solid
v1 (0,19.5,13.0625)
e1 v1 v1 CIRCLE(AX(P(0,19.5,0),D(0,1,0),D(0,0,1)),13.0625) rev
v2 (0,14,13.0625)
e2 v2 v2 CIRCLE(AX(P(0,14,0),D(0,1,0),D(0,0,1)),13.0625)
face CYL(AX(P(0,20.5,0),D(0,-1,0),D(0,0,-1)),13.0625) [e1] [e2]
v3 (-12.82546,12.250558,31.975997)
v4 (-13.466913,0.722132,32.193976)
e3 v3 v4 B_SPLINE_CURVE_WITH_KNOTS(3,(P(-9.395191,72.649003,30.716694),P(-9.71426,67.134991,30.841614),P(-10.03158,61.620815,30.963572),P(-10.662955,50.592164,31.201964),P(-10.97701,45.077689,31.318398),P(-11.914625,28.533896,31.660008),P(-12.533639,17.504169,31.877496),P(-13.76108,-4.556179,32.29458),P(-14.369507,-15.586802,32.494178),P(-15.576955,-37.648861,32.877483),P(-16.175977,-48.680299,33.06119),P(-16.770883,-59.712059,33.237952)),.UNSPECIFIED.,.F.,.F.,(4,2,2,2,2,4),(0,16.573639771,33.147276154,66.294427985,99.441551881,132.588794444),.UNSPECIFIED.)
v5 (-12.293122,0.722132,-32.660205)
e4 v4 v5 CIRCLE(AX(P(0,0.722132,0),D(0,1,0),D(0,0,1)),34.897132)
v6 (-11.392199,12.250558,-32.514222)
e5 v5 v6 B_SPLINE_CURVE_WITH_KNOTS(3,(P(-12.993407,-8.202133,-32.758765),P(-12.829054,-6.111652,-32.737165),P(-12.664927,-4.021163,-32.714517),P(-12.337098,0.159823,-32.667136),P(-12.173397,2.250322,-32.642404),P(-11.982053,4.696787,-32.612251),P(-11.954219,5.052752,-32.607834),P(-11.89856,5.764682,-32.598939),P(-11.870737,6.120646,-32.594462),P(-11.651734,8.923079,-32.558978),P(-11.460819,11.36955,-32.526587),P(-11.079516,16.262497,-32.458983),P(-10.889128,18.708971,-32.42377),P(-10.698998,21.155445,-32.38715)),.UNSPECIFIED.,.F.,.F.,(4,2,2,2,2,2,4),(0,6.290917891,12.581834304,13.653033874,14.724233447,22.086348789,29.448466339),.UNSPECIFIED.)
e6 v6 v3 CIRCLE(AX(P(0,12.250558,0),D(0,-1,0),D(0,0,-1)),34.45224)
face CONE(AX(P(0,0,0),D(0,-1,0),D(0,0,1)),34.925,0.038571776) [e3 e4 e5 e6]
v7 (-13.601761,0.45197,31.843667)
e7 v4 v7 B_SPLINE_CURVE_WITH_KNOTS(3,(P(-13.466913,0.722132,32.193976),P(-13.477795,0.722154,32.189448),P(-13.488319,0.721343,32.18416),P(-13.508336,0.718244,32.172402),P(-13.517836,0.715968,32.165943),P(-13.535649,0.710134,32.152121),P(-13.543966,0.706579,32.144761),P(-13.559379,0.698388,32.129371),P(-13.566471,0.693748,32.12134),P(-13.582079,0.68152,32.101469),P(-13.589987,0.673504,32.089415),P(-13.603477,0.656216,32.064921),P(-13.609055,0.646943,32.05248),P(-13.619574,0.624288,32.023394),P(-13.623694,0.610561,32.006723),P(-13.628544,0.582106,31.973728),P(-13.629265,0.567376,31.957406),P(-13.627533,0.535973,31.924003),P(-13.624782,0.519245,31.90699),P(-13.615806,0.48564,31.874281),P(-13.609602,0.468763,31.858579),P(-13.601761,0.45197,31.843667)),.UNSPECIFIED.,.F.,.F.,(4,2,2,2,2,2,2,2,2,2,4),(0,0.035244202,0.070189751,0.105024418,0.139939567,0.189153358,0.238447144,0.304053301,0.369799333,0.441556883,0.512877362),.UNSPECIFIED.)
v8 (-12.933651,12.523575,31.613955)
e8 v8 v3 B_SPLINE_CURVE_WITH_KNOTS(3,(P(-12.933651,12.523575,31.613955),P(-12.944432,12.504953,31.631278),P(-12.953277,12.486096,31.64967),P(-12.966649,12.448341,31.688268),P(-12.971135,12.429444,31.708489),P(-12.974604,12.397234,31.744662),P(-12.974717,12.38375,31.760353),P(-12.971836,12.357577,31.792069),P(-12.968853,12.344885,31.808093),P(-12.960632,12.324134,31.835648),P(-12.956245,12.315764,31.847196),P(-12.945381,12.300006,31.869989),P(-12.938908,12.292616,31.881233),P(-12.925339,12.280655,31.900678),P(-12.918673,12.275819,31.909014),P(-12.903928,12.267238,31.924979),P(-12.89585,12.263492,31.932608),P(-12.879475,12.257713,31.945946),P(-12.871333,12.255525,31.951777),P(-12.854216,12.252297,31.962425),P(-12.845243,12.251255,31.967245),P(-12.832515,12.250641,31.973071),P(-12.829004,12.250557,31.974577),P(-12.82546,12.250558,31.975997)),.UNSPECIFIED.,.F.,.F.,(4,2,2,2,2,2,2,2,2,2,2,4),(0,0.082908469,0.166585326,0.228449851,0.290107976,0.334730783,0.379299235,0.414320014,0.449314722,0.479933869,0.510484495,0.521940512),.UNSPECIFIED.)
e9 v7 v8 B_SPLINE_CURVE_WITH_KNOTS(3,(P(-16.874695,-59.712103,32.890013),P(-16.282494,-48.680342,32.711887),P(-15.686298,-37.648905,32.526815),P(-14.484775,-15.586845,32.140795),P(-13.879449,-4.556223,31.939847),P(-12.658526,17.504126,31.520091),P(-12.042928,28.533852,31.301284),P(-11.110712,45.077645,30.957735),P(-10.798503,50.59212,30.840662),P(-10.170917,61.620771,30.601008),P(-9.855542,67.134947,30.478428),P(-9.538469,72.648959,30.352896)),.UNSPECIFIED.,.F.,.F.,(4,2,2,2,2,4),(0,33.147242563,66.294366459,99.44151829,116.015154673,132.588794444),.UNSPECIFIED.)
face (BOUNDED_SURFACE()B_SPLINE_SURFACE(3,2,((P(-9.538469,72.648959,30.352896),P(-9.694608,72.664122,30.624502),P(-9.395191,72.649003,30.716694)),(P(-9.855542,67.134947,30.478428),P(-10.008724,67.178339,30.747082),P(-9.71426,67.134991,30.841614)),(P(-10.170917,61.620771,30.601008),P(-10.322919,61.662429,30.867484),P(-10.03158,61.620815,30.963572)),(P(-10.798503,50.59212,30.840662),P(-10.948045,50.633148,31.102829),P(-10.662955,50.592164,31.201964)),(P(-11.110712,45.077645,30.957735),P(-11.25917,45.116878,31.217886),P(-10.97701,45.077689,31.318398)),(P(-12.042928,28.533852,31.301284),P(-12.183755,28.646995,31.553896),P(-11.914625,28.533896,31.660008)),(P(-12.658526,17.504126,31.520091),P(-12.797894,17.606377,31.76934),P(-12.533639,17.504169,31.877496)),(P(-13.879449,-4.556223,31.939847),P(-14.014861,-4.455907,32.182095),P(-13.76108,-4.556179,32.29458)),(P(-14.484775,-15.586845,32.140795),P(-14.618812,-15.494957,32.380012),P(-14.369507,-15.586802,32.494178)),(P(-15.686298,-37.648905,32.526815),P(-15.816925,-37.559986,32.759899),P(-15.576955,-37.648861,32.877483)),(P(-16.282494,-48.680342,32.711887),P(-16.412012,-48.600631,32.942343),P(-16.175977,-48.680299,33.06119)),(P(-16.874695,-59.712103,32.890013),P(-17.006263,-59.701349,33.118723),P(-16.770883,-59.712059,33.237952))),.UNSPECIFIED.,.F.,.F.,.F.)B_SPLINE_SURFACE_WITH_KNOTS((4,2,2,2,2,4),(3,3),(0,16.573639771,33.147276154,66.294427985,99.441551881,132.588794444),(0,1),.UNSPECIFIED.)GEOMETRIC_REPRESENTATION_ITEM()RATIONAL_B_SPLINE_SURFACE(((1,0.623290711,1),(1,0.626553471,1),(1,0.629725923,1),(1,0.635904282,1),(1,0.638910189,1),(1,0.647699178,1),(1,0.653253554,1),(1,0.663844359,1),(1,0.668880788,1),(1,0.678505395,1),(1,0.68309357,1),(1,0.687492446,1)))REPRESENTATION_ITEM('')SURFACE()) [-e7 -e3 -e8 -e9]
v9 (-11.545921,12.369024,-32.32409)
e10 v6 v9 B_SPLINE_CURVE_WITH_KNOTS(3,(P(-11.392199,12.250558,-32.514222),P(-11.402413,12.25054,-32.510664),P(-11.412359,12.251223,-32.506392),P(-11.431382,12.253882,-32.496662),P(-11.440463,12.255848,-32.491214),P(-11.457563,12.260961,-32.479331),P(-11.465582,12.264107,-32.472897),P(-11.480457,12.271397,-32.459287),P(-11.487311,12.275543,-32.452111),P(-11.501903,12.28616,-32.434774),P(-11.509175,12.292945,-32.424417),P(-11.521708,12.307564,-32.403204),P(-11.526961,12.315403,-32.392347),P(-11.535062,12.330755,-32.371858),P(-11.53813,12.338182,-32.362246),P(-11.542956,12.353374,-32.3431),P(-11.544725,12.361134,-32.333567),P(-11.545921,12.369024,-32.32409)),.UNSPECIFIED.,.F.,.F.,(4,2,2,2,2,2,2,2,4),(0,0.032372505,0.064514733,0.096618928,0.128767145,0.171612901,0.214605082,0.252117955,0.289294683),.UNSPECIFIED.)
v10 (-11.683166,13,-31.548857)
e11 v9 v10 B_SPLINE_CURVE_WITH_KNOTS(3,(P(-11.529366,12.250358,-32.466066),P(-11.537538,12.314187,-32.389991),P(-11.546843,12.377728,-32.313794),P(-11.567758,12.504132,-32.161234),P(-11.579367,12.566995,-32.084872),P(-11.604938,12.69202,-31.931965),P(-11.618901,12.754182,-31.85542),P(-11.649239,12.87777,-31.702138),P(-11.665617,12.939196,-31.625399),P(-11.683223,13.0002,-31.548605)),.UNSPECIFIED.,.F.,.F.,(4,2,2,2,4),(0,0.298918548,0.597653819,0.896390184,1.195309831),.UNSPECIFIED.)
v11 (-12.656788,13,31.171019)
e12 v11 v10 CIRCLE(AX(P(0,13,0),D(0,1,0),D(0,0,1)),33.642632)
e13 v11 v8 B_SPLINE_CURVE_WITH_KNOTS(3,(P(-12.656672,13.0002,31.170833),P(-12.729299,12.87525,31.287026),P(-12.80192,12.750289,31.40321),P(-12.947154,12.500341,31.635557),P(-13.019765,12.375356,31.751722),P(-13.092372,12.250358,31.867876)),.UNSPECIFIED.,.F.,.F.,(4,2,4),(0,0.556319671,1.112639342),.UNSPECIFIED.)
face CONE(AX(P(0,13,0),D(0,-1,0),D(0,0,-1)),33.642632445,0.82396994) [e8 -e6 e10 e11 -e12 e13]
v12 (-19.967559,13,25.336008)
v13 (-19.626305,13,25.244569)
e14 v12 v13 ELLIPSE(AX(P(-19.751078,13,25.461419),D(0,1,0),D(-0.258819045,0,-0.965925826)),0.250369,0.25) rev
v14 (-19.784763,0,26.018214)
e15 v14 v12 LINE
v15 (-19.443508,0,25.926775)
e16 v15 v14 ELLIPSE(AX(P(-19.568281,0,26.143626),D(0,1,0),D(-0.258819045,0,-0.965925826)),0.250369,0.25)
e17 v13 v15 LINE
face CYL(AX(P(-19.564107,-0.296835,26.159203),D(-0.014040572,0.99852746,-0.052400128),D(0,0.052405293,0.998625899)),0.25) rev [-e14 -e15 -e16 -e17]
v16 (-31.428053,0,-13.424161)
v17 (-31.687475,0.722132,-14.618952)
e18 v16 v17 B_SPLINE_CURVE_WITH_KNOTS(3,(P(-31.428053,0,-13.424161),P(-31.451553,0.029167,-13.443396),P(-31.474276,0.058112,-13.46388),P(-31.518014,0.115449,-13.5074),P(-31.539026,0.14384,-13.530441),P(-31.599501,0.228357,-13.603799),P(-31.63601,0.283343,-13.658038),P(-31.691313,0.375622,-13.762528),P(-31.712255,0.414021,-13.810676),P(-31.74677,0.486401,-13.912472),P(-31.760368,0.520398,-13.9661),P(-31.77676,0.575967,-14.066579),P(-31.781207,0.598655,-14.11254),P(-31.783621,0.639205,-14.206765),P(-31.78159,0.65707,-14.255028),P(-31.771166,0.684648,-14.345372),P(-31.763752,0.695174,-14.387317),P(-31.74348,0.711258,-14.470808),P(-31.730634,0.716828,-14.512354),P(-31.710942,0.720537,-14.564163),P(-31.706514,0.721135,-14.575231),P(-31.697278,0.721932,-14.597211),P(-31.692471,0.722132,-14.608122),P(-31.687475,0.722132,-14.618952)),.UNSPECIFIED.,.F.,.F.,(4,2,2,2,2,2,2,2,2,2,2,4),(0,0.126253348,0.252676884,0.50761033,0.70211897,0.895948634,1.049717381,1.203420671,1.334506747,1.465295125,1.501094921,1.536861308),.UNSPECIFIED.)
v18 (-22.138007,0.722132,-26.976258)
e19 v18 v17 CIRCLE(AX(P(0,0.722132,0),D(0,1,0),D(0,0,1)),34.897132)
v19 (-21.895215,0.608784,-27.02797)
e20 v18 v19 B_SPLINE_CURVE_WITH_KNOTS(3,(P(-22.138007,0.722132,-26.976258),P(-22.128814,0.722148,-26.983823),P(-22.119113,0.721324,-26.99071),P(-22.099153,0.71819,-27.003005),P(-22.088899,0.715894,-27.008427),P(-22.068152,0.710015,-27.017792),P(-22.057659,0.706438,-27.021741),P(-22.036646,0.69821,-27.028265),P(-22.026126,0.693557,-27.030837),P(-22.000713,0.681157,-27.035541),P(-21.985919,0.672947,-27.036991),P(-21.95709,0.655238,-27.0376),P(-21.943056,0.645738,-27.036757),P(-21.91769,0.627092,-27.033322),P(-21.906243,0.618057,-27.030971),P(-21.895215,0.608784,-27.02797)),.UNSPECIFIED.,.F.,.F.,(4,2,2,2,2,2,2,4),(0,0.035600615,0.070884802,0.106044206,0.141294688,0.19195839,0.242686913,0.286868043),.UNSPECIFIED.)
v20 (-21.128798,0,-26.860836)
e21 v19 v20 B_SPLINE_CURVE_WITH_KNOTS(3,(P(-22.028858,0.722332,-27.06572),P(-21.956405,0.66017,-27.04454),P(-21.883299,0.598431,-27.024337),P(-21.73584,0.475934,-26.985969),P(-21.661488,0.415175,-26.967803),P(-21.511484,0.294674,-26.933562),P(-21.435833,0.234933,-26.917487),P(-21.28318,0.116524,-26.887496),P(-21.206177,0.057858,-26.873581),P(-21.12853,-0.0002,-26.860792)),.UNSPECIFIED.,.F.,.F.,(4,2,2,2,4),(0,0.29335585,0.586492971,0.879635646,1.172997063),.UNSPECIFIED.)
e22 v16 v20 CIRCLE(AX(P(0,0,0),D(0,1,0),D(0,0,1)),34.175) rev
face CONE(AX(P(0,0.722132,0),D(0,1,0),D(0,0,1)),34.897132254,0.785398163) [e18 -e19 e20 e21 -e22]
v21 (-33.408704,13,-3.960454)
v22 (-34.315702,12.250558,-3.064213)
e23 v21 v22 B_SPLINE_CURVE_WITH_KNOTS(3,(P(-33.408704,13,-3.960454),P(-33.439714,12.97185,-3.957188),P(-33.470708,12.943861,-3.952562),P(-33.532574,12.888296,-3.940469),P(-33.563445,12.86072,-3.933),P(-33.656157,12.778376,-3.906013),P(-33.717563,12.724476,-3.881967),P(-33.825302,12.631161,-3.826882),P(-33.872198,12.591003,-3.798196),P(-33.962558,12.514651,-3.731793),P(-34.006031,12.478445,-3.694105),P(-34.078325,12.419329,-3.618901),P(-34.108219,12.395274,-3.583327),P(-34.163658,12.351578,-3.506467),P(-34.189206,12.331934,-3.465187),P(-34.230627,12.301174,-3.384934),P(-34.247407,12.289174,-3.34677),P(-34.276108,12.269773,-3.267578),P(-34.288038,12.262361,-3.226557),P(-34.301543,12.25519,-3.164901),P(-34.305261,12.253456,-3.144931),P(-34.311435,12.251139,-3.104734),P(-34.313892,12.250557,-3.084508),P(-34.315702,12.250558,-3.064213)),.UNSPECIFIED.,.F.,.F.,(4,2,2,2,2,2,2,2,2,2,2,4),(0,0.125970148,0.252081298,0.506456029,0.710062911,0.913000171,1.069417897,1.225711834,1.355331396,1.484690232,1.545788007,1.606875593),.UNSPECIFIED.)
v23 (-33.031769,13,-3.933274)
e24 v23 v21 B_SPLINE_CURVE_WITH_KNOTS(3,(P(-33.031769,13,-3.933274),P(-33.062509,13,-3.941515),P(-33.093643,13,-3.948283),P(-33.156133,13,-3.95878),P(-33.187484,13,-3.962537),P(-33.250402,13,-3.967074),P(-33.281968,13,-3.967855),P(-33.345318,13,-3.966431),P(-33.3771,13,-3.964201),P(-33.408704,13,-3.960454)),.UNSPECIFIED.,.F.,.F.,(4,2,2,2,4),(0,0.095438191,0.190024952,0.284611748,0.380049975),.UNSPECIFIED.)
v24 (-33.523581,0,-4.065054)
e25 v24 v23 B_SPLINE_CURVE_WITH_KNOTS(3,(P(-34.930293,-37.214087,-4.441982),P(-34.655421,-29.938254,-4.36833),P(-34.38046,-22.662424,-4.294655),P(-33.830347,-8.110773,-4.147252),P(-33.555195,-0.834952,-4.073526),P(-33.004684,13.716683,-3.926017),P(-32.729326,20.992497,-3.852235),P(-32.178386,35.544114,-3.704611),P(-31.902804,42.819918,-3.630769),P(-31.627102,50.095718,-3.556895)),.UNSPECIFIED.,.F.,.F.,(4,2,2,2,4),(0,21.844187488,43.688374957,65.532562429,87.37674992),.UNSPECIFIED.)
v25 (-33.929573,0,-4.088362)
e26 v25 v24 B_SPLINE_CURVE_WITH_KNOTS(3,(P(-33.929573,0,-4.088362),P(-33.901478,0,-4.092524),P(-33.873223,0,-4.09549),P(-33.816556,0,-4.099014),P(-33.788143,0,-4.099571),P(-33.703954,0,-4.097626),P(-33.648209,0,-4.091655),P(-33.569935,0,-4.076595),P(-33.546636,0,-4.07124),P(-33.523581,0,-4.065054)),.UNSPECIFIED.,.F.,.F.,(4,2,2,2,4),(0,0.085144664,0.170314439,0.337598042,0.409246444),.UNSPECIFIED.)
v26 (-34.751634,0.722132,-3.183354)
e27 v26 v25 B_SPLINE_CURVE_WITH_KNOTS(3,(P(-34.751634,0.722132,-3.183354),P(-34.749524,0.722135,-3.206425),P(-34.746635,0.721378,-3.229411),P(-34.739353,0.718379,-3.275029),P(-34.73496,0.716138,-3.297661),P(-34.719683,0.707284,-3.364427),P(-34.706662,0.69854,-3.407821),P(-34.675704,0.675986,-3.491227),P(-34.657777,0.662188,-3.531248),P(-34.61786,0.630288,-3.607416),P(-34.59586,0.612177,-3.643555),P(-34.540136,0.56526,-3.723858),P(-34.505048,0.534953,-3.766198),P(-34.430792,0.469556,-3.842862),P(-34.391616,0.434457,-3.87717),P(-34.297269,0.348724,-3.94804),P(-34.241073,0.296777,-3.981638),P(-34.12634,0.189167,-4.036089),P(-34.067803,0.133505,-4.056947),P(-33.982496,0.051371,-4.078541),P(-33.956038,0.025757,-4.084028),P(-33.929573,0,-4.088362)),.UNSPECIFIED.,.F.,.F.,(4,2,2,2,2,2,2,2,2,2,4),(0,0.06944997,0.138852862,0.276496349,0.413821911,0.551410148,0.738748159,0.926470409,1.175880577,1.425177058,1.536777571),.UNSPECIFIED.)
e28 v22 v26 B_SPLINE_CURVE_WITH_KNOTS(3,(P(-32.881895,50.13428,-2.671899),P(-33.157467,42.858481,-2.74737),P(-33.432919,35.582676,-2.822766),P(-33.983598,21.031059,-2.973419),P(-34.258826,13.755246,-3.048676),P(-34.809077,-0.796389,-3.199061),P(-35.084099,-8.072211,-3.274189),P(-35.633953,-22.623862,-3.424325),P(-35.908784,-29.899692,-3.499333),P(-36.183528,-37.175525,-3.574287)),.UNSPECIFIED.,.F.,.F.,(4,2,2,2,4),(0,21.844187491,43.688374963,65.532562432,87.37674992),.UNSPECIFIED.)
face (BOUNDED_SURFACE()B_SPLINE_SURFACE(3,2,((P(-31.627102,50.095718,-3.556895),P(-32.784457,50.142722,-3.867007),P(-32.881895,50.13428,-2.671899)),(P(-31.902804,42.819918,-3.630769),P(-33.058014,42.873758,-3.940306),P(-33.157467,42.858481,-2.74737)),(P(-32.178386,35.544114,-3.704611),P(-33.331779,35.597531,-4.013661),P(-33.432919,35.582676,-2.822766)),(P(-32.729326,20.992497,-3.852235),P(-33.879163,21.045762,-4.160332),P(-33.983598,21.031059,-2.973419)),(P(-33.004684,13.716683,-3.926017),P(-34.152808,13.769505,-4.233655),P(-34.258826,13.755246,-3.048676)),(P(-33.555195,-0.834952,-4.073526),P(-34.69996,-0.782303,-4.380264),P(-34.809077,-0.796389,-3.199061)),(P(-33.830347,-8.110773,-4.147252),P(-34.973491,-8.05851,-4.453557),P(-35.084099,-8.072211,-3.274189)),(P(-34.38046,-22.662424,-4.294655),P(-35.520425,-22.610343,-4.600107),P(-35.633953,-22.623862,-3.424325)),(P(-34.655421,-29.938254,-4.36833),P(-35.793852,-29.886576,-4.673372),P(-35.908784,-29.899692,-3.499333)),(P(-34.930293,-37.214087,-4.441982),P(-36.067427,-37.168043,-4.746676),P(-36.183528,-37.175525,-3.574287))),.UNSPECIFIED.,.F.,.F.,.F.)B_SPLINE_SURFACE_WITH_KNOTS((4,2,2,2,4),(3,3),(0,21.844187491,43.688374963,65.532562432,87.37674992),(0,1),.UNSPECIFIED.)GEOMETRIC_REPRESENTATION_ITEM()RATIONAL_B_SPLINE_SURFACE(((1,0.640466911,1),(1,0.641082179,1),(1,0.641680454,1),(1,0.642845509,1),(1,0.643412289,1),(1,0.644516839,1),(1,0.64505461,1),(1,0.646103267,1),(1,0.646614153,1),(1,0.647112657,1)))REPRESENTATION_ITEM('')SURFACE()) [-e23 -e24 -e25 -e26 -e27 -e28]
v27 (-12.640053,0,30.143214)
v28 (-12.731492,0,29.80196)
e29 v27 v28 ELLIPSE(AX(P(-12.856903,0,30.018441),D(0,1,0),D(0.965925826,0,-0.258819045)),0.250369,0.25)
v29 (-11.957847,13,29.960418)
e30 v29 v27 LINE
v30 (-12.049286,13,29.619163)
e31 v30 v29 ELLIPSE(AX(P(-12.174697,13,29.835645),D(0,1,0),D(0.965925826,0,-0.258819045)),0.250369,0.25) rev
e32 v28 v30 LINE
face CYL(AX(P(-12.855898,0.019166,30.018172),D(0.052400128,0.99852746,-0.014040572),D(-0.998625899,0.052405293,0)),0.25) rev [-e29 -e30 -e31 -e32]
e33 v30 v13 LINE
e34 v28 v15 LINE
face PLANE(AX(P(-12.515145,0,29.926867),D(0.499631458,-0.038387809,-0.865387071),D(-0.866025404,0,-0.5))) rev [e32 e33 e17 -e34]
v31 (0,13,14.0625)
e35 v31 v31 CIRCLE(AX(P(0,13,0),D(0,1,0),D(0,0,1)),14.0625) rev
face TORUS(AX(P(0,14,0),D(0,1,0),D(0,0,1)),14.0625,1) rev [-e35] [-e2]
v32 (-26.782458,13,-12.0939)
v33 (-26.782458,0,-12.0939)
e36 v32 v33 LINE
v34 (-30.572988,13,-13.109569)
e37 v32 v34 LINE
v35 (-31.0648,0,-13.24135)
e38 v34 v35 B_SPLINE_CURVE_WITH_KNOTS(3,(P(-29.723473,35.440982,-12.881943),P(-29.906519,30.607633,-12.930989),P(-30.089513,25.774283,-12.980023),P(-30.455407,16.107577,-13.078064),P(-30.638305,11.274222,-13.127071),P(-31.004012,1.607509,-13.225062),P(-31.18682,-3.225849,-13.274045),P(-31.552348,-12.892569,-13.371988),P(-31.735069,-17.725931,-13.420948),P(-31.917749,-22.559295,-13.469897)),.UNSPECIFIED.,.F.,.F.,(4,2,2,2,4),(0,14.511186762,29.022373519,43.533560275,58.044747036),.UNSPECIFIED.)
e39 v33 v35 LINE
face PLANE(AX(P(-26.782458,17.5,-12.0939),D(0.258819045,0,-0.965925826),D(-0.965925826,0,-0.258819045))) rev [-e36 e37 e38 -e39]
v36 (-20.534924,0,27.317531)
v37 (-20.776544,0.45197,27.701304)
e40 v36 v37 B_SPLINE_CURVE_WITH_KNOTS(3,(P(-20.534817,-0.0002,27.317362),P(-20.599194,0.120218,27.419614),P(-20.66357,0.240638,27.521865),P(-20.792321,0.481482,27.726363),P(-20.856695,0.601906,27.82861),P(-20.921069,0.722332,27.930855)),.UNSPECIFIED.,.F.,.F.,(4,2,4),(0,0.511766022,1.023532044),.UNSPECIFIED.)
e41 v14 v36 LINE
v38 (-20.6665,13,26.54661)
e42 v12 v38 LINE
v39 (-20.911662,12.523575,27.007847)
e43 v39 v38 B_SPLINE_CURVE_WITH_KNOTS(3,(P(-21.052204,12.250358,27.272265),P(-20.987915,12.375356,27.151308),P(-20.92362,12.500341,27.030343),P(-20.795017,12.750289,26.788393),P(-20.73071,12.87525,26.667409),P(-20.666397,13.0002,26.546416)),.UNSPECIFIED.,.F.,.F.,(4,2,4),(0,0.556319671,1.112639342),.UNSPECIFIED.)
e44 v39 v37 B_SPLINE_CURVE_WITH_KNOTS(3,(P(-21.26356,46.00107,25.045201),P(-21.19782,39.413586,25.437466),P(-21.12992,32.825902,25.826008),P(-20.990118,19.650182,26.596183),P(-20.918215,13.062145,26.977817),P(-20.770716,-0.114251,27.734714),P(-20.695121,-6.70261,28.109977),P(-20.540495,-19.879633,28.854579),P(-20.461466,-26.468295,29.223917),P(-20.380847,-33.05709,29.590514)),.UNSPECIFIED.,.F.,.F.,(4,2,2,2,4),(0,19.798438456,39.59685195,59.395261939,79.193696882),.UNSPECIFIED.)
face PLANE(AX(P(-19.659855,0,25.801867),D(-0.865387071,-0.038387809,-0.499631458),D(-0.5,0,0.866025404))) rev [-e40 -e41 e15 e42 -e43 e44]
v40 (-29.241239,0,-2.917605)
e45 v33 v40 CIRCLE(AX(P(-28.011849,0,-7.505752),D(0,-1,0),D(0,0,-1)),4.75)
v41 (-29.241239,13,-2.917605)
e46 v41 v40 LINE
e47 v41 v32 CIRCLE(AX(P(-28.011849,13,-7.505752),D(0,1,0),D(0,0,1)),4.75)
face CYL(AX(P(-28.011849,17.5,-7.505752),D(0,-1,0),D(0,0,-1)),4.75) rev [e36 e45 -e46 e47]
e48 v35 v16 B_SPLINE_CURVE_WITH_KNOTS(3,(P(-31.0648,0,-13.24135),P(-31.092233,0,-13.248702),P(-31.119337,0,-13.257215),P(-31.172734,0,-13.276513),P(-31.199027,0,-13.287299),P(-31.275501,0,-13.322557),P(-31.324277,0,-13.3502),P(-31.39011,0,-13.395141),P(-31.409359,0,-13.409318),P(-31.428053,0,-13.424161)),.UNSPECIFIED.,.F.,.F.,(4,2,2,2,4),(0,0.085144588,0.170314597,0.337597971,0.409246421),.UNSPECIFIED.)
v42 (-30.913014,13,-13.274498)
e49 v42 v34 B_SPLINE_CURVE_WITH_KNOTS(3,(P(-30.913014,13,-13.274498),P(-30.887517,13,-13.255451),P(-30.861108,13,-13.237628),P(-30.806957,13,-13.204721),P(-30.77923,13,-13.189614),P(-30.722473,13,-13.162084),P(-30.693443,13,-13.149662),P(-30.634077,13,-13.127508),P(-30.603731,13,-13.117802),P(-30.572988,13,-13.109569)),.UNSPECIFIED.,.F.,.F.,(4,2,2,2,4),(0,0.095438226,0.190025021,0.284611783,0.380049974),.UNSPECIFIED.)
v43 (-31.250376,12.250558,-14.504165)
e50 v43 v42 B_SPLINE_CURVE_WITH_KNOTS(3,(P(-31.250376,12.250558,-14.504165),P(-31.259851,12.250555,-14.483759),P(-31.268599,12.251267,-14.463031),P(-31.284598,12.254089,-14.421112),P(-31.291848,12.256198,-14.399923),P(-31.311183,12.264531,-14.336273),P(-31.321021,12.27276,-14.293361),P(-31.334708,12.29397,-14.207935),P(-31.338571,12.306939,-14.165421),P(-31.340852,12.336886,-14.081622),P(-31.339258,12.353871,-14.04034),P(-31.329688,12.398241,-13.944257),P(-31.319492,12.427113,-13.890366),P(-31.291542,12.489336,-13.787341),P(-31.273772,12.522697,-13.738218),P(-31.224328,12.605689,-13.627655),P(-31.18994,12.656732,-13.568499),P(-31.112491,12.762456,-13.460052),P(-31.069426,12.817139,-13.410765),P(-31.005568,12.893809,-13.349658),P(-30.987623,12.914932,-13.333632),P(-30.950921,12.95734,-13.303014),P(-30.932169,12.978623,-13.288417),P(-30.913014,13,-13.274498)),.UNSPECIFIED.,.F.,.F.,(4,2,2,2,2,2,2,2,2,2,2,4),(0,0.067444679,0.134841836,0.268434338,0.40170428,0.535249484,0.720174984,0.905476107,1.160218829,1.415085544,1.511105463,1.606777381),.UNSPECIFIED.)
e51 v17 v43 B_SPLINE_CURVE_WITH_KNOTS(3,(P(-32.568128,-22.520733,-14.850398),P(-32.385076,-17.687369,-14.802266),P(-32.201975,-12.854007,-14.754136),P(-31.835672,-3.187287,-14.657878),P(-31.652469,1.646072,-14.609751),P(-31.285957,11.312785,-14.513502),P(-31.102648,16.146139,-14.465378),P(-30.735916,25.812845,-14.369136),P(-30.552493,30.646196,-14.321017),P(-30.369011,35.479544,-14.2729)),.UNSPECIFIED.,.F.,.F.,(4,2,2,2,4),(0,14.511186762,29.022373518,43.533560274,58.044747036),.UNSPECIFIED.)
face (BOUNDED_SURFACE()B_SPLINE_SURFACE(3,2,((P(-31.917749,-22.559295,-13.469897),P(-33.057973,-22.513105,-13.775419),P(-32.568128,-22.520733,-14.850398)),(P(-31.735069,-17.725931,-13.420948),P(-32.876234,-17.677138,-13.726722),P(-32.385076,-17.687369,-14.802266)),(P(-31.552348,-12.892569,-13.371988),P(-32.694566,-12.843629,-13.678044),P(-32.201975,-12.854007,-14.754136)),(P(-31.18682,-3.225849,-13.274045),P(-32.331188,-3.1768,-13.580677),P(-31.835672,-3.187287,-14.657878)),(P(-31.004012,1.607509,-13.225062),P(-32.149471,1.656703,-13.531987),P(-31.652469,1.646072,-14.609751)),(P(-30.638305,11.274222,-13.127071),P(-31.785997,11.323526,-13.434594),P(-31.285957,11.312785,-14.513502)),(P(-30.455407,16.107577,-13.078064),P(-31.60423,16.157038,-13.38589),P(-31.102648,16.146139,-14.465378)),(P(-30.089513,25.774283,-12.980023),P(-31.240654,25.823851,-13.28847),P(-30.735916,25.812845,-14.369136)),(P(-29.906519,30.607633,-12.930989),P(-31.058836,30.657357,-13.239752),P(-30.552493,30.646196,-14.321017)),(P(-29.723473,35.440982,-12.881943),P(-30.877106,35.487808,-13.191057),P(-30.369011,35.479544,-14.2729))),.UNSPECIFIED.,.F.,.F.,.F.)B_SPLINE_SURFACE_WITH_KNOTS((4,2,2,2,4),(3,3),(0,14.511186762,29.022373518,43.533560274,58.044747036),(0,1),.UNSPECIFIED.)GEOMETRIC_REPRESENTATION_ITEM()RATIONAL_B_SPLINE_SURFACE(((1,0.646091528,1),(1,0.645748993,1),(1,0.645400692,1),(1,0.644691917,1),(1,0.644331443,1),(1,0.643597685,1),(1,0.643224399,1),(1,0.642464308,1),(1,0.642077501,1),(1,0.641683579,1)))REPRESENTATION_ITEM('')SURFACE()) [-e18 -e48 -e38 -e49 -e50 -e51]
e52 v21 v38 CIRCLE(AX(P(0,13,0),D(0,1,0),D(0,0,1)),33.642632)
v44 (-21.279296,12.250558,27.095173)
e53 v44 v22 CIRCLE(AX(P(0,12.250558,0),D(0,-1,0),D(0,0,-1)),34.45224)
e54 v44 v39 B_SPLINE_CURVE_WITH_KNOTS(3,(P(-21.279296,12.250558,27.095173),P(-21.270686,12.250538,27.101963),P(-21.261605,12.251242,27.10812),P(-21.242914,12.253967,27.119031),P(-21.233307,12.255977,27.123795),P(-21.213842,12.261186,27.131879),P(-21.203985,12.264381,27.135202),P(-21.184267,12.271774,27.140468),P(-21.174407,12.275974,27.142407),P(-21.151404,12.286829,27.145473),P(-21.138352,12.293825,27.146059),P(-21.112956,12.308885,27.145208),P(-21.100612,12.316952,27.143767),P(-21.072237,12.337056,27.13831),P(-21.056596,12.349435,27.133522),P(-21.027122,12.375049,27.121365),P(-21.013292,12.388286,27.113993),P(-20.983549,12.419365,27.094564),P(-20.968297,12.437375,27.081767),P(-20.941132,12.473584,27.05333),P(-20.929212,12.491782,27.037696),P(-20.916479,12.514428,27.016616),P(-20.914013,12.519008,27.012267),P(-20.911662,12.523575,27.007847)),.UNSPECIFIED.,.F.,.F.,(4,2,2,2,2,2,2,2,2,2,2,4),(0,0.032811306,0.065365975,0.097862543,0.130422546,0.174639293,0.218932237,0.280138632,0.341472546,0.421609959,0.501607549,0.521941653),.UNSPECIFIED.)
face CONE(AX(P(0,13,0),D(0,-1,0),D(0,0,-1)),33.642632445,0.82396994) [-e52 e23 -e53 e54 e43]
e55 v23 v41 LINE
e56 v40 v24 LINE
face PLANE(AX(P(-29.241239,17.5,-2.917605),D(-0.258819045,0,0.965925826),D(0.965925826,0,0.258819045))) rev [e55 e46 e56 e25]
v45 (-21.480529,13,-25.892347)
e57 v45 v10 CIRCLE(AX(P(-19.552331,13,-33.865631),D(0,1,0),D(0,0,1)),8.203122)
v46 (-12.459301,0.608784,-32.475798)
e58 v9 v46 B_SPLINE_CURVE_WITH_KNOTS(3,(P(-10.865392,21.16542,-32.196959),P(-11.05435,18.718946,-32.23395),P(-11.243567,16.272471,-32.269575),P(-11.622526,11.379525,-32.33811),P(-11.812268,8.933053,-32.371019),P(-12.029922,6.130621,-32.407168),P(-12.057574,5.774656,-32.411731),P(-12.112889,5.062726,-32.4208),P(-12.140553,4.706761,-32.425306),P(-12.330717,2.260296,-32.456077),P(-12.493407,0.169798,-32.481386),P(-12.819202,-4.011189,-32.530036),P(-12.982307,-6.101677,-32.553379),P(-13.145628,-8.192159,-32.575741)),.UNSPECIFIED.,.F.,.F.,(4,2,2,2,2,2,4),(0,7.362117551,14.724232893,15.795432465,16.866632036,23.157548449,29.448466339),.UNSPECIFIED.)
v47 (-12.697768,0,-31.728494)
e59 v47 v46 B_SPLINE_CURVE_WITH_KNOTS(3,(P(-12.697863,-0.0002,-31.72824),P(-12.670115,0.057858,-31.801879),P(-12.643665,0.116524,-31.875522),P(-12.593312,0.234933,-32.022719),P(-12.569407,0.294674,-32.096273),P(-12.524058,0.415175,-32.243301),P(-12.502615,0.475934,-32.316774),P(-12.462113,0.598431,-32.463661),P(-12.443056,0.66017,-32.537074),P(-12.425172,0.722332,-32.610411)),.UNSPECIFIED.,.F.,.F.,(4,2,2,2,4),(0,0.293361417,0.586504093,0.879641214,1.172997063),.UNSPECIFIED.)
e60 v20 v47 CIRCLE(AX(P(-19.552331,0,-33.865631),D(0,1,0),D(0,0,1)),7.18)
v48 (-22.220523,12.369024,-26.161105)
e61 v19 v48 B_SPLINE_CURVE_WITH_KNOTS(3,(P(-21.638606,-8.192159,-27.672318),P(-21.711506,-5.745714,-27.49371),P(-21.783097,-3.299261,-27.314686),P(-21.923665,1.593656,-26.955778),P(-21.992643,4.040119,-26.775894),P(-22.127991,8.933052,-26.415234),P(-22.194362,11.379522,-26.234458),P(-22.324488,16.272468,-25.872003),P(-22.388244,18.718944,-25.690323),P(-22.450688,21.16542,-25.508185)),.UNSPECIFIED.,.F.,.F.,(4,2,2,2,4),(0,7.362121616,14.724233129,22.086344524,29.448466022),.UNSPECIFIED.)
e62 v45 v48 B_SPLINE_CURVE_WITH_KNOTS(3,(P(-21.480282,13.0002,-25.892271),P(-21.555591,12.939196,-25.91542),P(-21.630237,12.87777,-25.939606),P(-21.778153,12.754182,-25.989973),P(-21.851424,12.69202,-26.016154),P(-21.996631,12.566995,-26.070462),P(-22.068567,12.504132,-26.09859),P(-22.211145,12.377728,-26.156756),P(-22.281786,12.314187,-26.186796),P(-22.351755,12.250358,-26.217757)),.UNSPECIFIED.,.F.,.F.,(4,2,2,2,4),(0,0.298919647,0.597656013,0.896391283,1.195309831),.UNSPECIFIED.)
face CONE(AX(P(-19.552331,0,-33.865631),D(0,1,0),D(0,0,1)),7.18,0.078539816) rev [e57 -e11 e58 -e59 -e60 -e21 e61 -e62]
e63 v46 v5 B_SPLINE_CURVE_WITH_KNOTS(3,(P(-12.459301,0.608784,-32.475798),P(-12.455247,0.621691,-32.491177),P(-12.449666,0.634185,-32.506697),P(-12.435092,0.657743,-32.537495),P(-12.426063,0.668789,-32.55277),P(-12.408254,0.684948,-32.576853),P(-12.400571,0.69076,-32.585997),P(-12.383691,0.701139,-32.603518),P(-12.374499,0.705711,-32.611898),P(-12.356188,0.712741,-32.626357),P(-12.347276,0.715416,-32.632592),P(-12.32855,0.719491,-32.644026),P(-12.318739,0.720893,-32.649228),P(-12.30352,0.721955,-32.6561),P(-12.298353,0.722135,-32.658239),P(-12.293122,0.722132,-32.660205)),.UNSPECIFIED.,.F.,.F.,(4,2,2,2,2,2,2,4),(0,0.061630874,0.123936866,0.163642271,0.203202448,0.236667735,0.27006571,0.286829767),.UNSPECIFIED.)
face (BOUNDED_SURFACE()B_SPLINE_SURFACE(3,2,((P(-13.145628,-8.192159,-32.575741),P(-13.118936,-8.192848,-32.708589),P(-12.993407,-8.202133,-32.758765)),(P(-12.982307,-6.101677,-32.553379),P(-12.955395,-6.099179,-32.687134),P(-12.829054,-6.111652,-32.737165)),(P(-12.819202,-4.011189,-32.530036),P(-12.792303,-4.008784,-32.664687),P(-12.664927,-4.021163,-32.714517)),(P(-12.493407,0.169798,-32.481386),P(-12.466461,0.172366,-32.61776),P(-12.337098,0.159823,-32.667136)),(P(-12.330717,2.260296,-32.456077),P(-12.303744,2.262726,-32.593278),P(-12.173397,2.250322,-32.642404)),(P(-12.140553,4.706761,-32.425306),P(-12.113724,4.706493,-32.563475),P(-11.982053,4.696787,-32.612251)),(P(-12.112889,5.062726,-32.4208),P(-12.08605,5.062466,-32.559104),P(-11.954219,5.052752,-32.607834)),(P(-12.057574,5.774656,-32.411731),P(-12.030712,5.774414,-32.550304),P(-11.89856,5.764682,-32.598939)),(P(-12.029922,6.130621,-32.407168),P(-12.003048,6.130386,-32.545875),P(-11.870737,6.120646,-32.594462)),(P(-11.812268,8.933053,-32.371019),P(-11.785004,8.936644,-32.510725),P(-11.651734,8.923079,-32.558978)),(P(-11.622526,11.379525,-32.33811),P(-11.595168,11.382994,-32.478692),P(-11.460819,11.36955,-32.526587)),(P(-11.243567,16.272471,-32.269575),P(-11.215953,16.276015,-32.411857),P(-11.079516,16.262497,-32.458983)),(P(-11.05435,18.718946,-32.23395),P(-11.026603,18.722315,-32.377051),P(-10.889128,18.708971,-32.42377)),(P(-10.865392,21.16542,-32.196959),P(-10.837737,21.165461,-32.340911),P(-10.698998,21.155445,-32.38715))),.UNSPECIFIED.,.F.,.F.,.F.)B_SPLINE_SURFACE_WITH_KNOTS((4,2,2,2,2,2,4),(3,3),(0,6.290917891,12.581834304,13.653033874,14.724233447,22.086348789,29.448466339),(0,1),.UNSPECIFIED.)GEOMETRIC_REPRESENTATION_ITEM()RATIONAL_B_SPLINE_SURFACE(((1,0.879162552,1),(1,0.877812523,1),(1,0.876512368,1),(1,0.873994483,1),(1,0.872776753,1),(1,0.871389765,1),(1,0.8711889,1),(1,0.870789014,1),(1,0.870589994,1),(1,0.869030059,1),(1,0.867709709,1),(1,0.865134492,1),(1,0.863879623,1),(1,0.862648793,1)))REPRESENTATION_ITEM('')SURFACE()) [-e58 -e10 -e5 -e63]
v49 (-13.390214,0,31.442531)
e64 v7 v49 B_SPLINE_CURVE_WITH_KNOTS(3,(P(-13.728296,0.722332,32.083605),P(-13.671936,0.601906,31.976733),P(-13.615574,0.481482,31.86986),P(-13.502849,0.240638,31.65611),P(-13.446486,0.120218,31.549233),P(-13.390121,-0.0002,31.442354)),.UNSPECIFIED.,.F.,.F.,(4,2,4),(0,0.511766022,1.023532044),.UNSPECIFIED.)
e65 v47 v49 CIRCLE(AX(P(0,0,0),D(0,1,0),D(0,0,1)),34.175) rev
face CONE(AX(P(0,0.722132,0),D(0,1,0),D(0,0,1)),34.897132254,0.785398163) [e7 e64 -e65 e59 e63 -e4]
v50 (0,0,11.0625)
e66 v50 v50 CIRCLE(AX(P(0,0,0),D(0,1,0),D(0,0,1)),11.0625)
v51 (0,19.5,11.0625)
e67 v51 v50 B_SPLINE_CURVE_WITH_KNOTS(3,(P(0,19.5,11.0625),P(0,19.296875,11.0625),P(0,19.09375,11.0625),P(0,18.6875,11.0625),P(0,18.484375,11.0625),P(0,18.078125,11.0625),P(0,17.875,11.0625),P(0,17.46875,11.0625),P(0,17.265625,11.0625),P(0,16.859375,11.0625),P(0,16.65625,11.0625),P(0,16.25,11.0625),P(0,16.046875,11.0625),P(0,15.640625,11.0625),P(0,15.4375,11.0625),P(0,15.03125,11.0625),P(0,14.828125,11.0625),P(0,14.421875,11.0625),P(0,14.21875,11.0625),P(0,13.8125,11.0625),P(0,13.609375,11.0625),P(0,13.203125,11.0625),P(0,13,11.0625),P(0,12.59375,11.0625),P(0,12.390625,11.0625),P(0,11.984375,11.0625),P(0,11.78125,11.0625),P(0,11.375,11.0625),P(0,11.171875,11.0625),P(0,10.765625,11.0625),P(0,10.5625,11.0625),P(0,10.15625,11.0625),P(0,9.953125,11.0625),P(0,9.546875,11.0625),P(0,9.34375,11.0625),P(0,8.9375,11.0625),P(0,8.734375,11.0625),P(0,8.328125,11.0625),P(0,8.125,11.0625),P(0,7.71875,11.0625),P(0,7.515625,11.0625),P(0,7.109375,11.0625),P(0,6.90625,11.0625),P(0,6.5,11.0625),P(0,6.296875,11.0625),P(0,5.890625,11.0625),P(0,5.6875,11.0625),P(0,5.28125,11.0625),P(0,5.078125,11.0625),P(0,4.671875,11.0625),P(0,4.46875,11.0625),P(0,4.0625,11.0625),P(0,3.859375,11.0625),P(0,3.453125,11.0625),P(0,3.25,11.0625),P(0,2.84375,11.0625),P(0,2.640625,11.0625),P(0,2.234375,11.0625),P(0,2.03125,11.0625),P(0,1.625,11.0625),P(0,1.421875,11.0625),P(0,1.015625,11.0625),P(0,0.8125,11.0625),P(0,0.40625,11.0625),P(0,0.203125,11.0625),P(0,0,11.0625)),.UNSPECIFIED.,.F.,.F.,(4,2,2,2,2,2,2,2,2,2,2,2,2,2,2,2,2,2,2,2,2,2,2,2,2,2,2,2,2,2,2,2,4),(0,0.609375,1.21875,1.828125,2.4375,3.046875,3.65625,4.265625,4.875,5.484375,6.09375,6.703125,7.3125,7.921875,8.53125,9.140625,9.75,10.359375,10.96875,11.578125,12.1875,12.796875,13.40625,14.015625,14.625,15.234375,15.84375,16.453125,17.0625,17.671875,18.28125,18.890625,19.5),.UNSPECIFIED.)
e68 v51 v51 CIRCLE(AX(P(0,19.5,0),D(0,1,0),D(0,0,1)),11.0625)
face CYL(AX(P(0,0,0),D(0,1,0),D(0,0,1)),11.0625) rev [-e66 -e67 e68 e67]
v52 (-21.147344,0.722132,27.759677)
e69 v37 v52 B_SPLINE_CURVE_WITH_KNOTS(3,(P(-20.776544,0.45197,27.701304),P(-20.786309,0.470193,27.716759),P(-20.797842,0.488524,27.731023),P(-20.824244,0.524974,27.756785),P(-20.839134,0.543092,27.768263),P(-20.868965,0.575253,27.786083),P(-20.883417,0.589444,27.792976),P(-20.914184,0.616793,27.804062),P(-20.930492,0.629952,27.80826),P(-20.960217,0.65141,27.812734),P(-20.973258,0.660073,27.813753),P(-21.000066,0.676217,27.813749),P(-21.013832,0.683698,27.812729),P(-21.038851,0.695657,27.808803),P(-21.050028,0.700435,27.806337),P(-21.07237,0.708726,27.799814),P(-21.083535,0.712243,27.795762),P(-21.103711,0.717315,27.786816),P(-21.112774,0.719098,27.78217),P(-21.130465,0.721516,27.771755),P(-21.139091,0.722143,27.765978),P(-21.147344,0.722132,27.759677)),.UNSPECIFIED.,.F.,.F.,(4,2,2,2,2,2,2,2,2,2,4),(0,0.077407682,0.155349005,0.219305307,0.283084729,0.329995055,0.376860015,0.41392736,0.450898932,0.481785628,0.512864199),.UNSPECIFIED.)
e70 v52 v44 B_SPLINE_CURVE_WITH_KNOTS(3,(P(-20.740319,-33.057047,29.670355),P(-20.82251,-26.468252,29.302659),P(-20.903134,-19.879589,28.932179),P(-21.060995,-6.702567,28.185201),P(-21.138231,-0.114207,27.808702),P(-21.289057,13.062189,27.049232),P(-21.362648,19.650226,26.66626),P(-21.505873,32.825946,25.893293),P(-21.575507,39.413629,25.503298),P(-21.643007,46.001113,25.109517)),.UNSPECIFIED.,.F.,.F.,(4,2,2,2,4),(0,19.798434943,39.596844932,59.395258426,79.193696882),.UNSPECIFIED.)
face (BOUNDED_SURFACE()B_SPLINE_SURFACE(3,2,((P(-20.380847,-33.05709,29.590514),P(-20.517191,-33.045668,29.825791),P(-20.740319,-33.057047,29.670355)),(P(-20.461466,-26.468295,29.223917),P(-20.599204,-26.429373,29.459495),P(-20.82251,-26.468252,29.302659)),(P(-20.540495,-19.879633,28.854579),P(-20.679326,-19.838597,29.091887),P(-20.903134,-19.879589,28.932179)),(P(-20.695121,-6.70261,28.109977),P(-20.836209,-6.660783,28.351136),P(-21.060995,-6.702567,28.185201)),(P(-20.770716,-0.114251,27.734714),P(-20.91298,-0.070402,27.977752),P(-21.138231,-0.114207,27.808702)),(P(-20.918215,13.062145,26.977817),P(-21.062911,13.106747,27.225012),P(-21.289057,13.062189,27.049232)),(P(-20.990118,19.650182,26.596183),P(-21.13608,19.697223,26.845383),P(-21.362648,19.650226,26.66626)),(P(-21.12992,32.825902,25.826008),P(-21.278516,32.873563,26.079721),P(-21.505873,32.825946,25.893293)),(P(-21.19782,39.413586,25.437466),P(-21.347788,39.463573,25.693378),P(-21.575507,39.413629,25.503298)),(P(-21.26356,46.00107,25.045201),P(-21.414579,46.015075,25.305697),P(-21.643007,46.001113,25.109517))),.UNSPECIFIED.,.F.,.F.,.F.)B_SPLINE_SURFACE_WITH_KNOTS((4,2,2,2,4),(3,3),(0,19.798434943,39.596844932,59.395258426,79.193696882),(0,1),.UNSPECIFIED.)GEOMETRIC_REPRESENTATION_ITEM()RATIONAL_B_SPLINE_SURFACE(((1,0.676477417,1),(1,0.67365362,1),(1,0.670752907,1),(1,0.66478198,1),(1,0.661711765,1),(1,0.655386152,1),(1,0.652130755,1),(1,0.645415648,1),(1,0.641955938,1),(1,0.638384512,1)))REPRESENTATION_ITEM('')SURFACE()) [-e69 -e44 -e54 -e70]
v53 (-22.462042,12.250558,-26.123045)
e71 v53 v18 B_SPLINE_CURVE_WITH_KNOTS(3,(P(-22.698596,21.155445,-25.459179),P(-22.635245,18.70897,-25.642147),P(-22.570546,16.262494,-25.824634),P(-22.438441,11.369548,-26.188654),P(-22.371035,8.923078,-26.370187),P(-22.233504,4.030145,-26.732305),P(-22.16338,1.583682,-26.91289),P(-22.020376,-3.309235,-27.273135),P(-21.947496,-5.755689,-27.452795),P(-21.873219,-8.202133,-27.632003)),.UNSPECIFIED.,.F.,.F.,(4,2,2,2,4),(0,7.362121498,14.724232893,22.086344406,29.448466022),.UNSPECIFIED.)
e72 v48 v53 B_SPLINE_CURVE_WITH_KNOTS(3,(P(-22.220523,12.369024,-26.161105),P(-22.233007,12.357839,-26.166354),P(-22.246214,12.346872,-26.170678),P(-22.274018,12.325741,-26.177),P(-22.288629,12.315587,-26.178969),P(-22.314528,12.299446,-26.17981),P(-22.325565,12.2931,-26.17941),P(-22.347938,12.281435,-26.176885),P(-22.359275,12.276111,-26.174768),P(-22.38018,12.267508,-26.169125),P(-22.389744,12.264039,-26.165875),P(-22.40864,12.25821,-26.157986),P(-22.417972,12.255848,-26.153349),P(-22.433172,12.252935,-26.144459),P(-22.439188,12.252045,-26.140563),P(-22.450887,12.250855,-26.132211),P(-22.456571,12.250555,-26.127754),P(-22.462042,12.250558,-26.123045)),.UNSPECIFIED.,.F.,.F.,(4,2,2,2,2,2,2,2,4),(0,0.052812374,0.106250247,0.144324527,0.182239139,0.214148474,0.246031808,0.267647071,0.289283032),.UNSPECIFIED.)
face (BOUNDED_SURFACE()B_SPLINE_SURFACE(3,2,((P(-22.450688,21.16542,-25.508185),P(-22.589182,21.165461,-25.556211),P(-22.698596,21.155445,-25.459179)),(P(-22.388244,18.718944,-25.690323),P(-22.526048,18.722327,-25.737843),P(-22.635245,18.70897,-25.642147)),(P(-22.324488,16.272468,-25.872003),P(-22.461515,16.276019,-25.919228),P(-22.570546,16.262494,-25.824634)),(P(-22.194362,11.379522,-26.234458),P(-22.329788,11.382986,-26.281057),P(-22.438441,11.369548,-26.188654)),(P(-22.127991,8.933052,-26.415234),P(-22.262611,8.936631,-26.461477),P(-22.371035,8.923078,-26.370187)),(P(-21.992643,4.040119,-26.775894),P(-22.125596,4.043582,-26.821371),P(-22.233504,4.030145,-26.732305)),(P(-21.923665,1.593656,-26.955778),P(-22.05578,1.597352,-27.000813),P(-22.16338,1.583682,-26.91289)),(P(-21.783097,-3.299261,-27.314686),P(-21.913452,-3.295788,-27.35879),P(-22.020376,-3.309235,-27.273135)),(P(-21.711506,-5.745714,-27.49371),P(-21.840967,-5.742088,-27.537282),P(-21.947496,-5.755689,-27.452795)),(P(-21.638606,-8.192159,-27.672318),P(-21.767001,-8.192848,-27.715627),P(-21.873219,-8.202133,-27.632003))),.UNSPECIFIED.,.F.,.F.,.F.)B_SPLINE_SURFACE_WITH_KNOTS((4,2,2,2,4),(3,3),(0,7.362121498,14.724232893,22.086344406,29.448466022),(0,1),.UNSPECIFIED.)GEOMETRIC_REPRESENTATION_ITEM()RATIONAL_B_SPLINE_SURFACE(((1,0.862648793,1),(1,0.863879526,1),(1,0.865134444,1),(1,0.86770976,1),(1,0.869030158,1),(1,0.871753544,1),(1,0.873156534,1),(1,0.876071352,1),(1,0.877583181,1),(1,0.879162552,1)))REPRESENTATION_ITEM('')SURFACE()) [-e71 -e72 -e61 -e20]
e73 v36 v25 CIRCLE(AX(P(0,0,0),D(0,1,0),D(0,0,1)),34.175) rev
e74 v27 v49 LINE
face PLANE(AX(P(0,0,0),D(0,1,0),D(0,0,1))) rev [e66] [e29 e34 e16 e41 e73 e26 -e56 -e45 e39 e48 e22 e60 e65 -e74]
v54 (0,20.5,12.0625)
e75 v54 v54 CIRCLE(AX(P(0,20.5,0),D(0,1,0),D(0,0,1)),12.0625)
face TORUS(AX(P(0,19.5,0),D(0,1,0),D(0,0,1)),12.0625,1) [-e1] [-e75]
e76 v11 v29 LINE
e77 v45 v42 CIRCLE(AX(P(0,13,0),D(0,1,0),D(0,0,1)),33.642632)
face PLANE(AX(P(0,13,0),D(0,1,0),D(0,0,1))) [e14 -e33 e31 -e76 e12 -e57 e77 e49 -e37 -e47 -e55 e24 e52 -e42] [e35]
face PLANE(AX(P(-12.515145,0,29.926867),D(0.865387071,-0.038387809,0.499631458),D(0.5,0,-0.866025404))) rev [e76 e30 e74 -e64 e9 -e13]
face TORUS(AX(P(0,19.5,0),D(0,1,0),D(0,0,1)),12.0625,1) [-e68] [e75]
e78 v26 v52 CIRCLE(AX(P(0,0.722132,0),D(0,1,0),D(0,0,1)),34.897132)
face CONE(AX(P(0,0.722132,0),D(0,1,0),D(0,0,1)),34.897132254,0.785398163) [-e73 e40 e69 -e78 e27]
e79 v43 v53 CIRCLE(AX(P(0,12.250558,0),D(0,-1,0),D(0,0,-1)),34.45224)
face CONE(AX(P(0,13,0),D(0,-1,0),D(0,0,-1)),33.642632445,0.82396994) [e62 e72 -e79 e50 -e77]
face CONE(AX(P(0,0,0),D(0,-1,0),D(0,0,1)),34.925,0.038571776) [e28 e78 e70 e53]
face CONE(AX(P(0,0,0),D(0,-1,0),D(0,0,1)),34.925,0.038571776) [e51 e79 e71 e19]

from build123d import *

# Parameters (mm, degrees)
SKETCH1_R           = 34.925
BOSS_EXTRUDE1_DEPTH = 13
BOSS_EXTRUDE1_TAPER = 2.21
CHAMFER1_SIZE       = 0.722669775
CHAMFER1_SIZE_2     = 0.75
CHAMFER1_SIZE_3     = 0.780685639
CUT_EXTRUDE1_DEPTH  = 13
CUT_EXTRUDE1_DRAFT  = -4.5
CUT_EXTRUDE2_DEPTH  = 13
CUT_EXTRUDE2_DRAFT  = -2.2
CUT_EXTRUDE4_DEPTH  = 17.5
FILLET1_R           = 0.25
SKETCH6_R           = 11.0625
CUT_EXTRUDE3_DEPTH  = 13
BOSS_EXTRUDE2_START = 7.5
SKETCH7_R           = 13.0625
SKETCH7_R_2         = 11.0625
BOSS_EXTRUDE2_DEPTH = 7.5
FILLET2_R           = 1


# Some blends are built 0.0001 mm under size
with BuildPart() as part:
    # Sketch1 → Boss-Extrude1 (new body)
    with BuildSketch(Plane(origin=(0, 0, 0), x_dir=(1, 0, 0), z_dir=(0, 1, 0))):
        Circle(SKETCH1_R)
    extrude(amount=BOSS_EXTRUDE1_DEPTH, taper=BOSS_EXTRUDE1_TAPER)

    # Chamfer1
    # the kernel refuses this chamfer: 0.780685639, 0.75, 0.722669775 mm, written as the material it takes off along each edge
    with BuildSketch(Plane(origin=(0, 0, 0), x_dir=(1, 0, 0), z_dir=(0, 0, 1))) as chamfer1_piece_1:
        Polygon((34.925 - CHAMFER1_SIZE * 0.038562212794, CHAMFER1_SIZE * 0.999256201571), (34.925 - CHAMFER1_SIZE_2, 0), (34.925, 0), align=None)
    revolve(axis=Axis((0, 0, 0), (0, 1, 0)), mode=Mode.SUBTRACT)
    with BuildSketch(Plane(origin=(0, 13, 0), x_dir=(1, 0, 0), z_dir=(0, 0, -1))) as chamfer1_piece_2:
        Polygon((34.423318083 + CHAMFER1_SIZE_2 * 0.0385622127818, CHAMFER1_SIZE_2 * 0.999256201254), (34.423318083 - CHAMFER1_SIZE_3, 0), (34.423318083, 0), align=None)
    revolve(axis=Axis((0, 13, 0), (0, -1, 0)), mode=Mode.SUBTRACT)


with BuildPart() as cut_extrude1_tool:
    # Sketch3 → Cut-Extrude1 (with draft: the straight prism first)
    with BuildSketch(Plane(origin=(0, 0, 0), x_dir=(1, 0, 0), z_dir=(0, 1, 0))):
        with BuildLine():
            ThreePointArc((-22.007744855, 27.11853225), (-15.962331288, 27.647568798), (-12.481465414, 32.61853225))
            ThreePointArc((-12.481465414, 32.61853225), (-17.4625, 30.245937227), (-22.007744855, 27.11853225))
        make_face()
    extrude(amount=CUT_EXTRUDE1_DEPTH)
    # Cut-Extrude1: the draft: its side faces are tilted about the plane it starts from
    cut_extrude1_sides = [cut_extrude1_tool.faces().sort_by_distance(p)[0] for p in [
        (-15.962331288, 6.5, -27.647568798),
        (-17.4625, 6.5, -30.245937227),
    ]]
    draft(cut_extrude1_sides, Plane(origin=(0, 0, 0), x_dir=(1, 0, 0), z_dir=(0, 1, 0)), CUT_EXTRUDE1_DRAFT)


with BuildPart() as part_1:
    add(part.part)

    # Cut-Extrude1: cut by cut_extrude1_tool
    add(cut_extrude1_tool.part, mode=Mode.SUBTRACT)


with BuildPart() as cut_extrude2_tool:
    # Sketch5 → Cut-Extrude2 (with draft: the straight prism first)
    with BuildSketch(Plane(origin=(0, 0, 0), x_dir=(1, 0, 0), z_dir=(0, 1, 0))):
        Polygon((-12.515145209, -29.926867367), (-19.659854791, -25.801867367), (-22.409854791, -30.565007088), (-15.265145209, -34.690007088), align=None)
    extrude(amount=CUT_EXTRUDE2_DEPTH)
    # Cut-Extrude2: the draft: its side faces are tilted about the plane it starts from
    cut_extrude2_sides = [cut_extrude2_tool.faces().sort_by_distance(p)[0] for p in [
        (-16.0875, 6.5, 27.864367367),
        (-21.034854791, 6.5, 28.183437227),
        (-18.8375, 6.5, 32.627507088),
        (-13.890145209, 6.5, 32.308437227),
    ]]
    draft(cut_extrude2_sides, Plane(origin=(0, 0, 0), x_dir=(1, 0, 0), z_dir=(0, 1, 0)), CUT_EXTRUDE2_DRAFT)


with BuildPart() as part_2:
    add(part_1.part)

    # Cut-Extrude2: cut by cut_extrude2_tool
    add(cut_extrude2_tool.part, mode=Mode.SUBTRACT)

    # Sketch8 → Cut-Extrude4 (cut)
    with BuildSketch(Plane.XZ):
        with BuildLine():
            Line((-26.782458498, -12.093899983), (-34.509865108, -14.164452344))
            ThreePointArc((-34.509865108, -14.164452344), (-40.327403248, -10.805695133), (-36.968646037, -4.988156994))
            Line((-36.968646037, -4.988156994), (-29.241239427, -2.917604633))
            ThreePointArc((-29.241239427, -2.917604633), (-23.423701288, -6.276361844), (-26.782458498, -12.093899983))
        make_face()
    extrude(amount=-CUT_EXTRUDE4_DEPTH, mode=Mode.SUBTRACT)

    # Fillet1
    fillet1_edges = [part_2.edges().sort_by_distance(p)[0] for p in [
        (-12.174042092, 6.5, 29.835469062),
        (-19.751253095, 6.5, 25.46076425),
        (-13.410686626, 6.486385182, 31.976354169),
        (-20.986991717, 6.486385182, 27.602172385),
        (-22.192531964, 6.486342052, -26.642548455),
        (-11.976857671, 6.486342043, -32.54057076),
    ]]
    fillet(fillet1_edges, radius=FILLET1_R)

    # Sketch6 → Cut-Extrude3 (cut)
    with BuildSketch(Plane(origin=(0, 13, 0), x_dir=(1, 0, 0), z_dir=(0, 1, 0))):
        with Locations(Location((0, 0, 0), (0, 0, 270))):
            Circle(SKETCH6_R)
    extrude(amount=-CUT_EXTRUDE3_DEPTH, mode=Mode.SUBTRACT)

    # Sketch7 → Boss-Extrude2 (add)
    with BuildSketch(Plane(origin=(0, 13, 0), x_dir=(1, 0, 0), z_dir=(0, 1, 0)).offset(BOSS_EXTRUDE2_START)):
        with Locations(Location((0, 0, 0), (0, 0, 270))):
            Circle(SKETCH7_R)
        with Locations(Location((0, 0, 0), (0, 0, 270))):
            Circle(SKETCH7_R_2, mode=Mode.SUBTRACT)
    extrude(amount=-BOSS_EXTRUDE2_DEPTH)

    # Fillet2
    fillet2_edges = [part_2.edges().sort_by_distance(p)[0] for p in [
        (0, 20.5, -11.0625),
        (0, 20.5, -13.0625),
        (0, 13, -13.0625),
        (-34.406108256, 6.505188254, -4.301527065),
        (-31.947327327, 6.505188254, -13.477822415),
    ]]
    fillet(fillet2_edges, radius=FILLET2_R - 0.0001)  # a hair under: the kernel refuses the full size


solid = part_2.part
